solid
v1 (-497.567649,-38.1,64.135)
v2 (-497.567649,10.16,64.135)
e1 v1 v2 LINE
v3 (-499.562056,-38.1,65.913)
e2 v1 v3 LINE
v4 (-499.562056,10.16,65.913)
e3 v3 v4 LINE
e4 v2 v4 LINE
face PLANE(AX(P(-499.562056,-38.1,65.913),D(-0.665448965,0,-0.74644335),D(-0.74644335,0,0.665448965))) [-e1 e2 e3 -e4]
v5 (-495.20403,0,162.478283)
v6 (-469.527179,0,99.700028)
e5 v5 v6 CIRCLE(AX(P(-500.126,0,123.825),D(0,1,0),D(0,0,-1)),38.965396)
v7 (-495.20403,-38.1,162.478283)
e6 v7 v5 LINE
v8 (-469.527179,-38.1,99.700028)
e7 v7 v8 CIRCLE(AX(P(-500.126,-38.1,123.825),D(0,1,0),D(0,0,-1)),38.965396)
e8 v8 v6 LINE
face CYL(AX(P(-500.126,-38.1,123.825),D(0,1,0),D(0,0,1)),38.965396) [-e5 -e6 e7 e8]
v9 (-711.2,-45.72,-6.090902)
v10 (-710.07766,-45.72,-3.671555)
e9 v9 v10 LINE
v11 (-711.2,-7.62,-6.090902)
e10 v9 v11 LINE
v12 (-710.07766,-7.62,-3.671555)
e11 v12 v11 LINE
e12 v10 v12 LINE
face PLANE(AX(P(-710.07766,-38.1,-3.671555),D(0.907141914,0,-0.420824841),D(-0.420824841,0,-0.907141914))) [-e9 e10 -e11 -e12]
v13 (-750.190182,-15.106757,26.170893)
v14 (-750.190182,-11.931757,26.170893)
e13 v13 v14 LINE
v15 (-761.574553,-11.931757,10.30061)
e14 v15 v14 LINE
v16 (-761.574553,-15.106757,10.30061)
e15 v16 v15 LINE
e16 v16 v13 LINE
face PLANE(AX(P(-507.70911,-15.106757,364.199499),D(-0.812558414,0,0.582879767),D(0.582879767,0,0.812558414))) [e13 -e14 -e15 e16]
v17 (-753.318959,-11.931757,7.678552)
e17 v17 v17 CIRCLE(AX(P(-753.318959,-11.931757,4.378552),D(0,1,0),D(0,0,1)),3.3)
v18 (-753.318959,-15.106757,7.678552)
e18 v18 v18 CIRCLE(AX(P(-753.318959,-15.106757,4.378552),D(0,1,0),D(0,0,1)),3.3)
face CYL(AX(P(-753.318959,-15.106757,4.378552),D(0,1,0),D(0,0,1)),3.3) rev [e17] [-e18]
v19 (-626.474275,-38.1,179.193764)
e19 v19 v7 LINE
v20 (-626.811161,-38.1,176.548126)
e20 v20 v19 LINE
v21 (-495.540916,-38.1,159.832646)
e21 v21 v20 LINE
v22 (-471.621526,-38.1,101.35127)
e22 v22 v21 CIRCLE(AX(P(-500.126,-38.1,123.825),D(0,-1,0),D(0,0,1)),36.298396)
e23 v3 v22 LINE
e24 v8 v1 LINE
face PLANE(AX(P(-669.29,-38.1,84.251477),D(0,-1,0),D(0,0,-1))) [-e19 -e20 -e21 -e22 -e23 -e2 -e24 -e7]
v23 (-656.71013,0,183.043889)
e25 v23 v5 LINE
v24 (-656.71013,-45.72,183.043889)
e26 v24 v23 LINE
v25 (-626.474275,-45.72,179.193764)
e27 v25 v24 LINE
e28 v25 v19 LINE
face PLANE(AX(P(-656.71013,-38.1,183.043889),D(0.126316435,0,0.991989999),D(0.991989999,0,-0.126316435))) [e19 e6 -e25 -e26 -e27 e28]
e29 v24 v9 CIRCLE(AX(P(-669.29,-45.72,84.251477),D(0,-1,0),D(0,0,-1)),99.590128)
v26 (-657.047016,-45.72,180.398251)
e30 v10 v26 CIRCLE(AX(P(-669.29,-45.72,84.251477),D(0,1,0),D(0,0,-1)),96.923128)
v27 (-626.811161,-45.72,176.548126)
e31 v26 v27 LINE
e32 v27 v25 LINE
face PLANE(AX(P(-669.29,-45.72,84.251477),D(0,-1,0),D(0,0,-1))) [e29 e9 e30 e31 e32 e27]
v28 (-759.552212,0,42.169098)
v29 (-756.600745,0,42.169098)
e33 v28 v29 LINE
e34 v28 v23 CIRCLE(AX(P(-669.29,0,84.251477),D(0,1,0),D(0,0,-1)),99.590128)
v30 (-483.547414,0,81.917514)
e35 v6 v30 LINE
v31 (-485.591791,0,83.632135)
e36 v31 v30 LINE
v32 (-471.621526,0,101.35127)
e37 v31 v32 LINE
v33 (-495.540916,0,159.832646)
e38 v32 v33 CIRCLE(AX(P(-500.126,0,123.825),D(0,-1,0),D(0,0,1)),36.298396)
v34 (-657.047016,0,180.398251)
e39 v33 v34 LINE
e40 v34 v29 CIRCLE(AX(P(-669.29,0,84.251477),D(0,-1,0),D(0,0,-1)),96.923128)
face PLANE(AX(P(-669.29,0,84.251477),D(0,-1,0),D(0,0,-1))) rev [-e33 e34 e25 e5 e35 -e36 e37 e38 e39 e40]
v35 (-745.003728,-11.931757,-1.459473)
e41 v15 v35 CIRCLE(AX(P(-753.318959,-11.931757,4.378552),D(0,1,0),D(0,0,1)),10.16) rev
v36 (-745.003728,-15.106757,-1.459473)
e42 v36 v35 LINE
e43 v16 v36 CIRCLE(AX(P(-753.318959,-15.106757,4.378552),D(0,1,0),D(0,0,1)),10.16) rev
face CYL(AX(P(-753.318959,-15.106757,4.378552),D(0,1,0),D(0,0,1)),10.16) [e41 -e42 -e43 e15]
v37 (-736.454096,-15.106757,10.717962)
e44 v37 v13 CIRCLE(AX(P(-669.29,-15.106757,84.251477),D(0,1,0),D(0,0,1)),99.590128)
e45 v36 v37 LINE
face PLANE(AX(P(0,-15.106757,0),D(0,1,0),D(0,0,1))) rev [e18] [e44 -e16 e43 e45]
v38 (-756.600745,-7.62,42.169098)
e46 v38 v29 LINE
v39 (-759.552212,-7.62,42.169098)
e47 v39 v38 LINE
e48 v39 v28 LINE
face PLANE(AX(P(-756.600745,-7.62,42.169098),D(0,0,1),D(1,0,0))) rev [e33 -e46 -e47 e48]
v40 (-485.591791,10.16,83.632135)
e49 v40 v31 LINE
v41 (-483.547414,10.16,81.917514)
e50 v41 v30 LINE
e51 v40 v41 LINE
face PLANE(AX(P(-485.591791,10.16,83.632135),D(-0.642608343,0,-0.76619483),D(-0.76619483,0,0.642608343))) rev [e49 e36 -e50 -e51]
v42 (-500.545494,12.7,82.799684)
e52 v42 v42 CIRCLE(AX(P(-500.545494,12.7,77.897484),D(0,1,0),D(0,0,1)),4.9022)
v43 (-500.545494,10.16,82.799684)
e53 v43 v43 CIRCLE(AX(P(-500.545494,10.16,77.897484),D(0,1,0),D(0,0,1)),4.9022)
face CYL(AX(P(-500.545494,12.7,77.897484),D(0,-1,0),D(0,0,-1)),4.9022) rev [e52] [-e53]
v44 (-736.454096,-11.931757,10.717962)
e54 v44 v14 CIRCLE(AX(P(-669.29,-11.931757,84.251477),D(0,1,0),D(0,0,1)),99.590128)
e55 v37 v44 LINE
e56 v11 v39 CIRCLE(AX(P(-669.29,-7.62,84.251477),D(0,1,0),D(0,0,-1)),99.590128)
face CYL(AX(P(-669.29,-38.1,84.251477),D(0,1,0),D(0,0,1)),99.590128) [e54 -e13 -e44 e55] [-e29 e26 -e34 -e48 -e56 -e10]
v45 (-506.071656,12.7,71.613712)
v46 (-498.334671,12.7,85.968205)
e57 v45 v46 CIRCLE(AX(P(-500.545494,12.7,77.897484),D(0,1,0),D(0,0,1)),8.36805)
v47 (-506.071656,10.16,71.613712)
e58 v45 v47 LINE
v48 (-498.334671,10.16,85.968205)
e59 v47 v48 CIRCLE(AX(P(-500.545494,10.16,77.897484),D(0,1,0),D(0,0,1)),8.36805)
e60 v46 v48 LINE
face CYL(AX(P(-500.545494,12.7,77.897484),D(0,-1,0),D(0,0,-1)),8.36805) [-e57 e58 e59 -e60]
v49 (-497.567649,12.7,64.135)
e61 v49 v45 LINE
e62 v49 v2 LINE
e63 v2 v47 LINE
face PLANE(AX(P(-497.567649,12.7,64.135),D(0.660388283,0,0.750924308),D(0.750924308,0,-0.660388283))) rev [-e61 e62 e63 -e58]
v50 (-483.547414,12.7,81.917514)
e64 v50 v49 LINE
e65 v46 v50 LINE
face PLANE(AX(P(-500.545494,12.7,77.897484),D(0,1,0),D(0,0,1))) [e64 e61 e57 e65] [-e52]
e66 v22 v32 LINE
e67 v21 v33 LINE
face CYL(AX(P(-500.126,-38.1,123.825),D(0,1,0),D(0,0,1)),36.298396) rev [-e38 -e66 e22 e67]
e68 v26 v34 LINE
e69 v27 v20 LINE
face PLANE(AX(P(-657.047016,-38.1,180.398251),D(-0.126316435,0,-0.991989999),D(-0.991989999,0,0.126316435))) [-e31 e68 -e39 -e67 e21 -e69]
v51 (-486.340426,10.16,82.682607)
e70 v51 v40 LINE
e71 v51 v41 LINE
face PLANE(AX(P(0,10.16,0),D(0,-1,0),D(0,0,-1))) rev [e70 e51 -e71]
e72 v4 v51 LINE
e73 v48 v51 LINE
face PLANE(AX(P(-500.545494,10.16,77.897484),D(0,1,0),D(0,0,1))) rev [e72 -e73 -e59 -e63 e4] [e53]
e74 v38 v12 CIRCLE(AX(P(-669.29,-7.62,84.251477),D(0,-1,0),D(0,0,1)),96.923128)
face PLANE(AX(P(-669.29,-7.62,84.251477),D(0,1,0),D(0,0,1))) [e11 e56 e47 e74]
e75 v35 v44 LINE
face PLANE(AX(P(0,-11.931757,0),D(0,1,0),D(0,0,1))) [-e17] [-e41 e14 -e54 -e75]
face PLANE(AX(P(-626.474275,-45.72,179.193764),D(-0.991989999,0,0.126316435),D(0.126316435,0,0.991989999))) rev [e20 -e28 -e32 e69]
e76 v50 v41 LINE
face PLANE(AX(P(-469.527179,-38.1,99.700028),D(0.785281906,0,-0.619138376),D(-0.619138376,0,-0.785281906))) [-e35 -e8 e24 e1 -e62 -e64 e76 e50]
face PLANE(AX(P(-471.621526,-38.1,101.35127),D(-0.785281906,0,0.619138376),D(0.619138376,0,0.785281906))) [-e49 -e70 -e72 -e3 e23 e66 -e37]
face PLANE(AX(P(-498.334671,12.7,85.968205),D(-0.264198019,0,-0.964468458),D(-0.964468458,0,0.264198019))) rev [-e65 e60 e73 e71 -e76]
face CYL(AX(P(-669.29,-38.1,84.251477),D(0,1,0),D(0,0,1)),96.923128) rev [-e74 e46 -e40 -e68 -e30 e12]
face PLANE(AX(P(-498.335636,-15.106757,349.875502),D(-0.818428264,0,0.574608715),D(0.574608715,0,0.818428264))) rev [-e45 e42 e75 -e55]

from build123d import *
from build123d.topology import SkipClean

# Parameters (mm, degrees)
BASE_FLANGE1_DEPTH  = 38.1
CUT_EXTRUDE1_DEPTH  = 7.62
SKETCH9_R           = 3.3
BOSS_EXTRUDE1_DEPTH = 3.175
BOSS_EXTRUDE2_DEPTH = 7.62
BOSS_EXTRUDE4_DEPTH = 10.16
SKETCH14_R          = 4.9022
BOSS_EXTRUDE5_DEPTH = 2.54


# Sheet-metal steps are written as plain solids
with BuildPart() as part:
    # Sketch1 → Base-Flange1 (new body)
    with BuildSketch(Plane(origin=(0, 0, 0), x_dir=(1, 0, 0), z_dir=(0, 1, 0))):
        with BuildLine():
            Line((-657.047015903, -180.398251424), (-495.540915967, -159.83264605))
            ThreePointArc((-495.540915967, -159.83264605), (-466.529161595, -137.56639807), (-471.621526187, -101.351269827))
            Line((-471.621526187, -101.351269827), (-499.562056453, -65.912999952))
            Line((-499.562056453, -65.912999952), (-497.56764915, -64.134999952))
            Line((-497.56764915, -64.134999952), (-469.527179345, -99.700027778))
            ThreePointArc((-469.527179345, -99.700027778), (-464.060656724, -138.576037958), (-495.204030033, -162.478283377))
            Line((-495.204030033, -162.478283377), (-656.710129969, -183.043888751))
            ThreePointArc((-656.710129969, -183.043888751), (-764.987734735, -111.822063922), (-711.2, 6.090902363))
            Line((-711.2, 6.090902363), (-710.077660148, 3.671554877))
            ThreePointArc((-710.077660148, 3.671554877), (-762.424972114, -111.083730158), (-657.047015903, -180.398251424))
        make_face()
    extrude(amount=-BASE_FLANGE1_DEPTH)

    # Sketch7 → Cut-Extrude1 (cut)
    with BuildSketch(Plane(origin=(-711.2, 0, -6.090902363), x_dir=(1, 0, 0), z_dir=(0, 1, 0))):
        with BuildLine():
            Line((1.122339852, -2.419347486), (0, 0))
            ThreePointArc((0, 0), (-28.443609249, -19.854342865), (-48.352212426, -48.26))
            Line((-48.352212426, -48.26), (-45.400744677, -48.26))
            ThreePointArc((-45.400744677, -48.26), (-26.116771828, -21.302890058), (1.122339852, -2.419347486))
        make_face()
    extrude(amount=-CUT_EXTRUDE1_DEPTH, mode=Mode.SUBTRACT)

    # Sketch9 → Boss-Extrude1 (add)
    with BuildSketch(Plane(origin=(0, -11.93175668, 0), x_dir=(1, 0, 0), z_dir=(0, 1, 0))):
        with BuildLine():
            ThreePointArc((-745.00372812, 1.45947251), (-759.199076387, 3.906966827), (-761.574552778, -10.300610474))
            Line((-761.574552778, -10.300610474), (-750.190181644, -26.170892956))
            ThreePointArc((-750.190181644, -26.170892956), (-749.293417822, -24.941724272), (-748.377980117, -23.726399288))
            ThreePointArc((-748.377980117, -23.726399288), (-742.704728301, -16.957559782), (-736.454096434, -10.717962385))
            Line((-736.454096434, -10.717962385), (-745.00372812, 1.45947251))
        make_face()
        with Locations(Location((-753.318959287, -4.37855204, 0), (0, 0, 270))):
            Circle(SKETCH9_R, mode=Mode.SUBTRACT)
    extrude(amount=-BOSS_EXTRUDE1_DEPTH)

    # Sketch10 → Boss-Extrude2 (add)
    with SkipClean():  # the faces are left unmerged after this step: merging them gives an invalid solid
        with BuildSketch(Plane.XZ.offset(38.1)):
            with BuildLine():
                Line((-710.077660148, -3.671554877), (-711.2, -6.090902363))
                ThreePointArc((-711.2, -6.090902363), (-764.987734735, 111.822063922), (-656.710129969, 183.043888751))
                Line((-656.710129969, 183.043888751), (-626.474274799, 179.193763797))
                Line((-626.474274799, 179.193763797), (-626.811160733, 176.54812647))
                Line((-626.811160733, 176.54812647), (-657.047015903, 180.398251424))
                ThreePointArc((-657.047015903, 180.398251424), (-762.424972114, 111.083730158), (-710.077660148, -3.671554877))
            make_face()
        extrude(amount=BOSS_EXTRUDE2_DEPTH)

    # Sketch12 → Boss-Extrude4 (add)
    with SkipClean():  # the faces are left unmerged after this step: merging them gives an invalid solid
        with BuildSketch(Plane(origin=(0, 0, 0), x_dir=(1, 0, 0), z_dir=(0, 1, 0))):
            Polygon((-497.56764915, -64.134999952), (-499.562056453, -65.912999952), (-485.59179132, -83.632134889), (-483.547414248, -81.917513865), align=None)
        extrude(amount=BOSS_EXTRUDE4_DEPTH)

    # Sketch14 → Boss-Extrude5 (add)
    with SkipClean():  # the faces are left unmerged after this step: merging them gives an invalid solid
        with BuildSketch(Plane(origin=(0, 10.16, 0), x_dir=(1, 0, 0), z_dir=(0, 1, 0))):
            with BuildLine():
                Line((-483.547414248, -81.917513865), (-497.56764915, -64.134999952))
                Line((-497.56764915, -64.134999952), (-506.071656266, -71.613711984))
                ThreePointArc((-506.071656266, -71.613711984), (-507.911682699, -81.867815661), (-498.334671428, -85.968205228))
                Line((-498.334671428, -85.968205228), (-483.547414248, -81.917513865))
            make_face()
            with Locations(Location((-500.545493785, -77.897484492, 0), (0, 0, 270))):
                Circle(SKETCH14_R, mode=Mode.SUBTRACT)
        extrude(amount=BOSS_EXTRUDE5_DEPTH)


solid = part.part
